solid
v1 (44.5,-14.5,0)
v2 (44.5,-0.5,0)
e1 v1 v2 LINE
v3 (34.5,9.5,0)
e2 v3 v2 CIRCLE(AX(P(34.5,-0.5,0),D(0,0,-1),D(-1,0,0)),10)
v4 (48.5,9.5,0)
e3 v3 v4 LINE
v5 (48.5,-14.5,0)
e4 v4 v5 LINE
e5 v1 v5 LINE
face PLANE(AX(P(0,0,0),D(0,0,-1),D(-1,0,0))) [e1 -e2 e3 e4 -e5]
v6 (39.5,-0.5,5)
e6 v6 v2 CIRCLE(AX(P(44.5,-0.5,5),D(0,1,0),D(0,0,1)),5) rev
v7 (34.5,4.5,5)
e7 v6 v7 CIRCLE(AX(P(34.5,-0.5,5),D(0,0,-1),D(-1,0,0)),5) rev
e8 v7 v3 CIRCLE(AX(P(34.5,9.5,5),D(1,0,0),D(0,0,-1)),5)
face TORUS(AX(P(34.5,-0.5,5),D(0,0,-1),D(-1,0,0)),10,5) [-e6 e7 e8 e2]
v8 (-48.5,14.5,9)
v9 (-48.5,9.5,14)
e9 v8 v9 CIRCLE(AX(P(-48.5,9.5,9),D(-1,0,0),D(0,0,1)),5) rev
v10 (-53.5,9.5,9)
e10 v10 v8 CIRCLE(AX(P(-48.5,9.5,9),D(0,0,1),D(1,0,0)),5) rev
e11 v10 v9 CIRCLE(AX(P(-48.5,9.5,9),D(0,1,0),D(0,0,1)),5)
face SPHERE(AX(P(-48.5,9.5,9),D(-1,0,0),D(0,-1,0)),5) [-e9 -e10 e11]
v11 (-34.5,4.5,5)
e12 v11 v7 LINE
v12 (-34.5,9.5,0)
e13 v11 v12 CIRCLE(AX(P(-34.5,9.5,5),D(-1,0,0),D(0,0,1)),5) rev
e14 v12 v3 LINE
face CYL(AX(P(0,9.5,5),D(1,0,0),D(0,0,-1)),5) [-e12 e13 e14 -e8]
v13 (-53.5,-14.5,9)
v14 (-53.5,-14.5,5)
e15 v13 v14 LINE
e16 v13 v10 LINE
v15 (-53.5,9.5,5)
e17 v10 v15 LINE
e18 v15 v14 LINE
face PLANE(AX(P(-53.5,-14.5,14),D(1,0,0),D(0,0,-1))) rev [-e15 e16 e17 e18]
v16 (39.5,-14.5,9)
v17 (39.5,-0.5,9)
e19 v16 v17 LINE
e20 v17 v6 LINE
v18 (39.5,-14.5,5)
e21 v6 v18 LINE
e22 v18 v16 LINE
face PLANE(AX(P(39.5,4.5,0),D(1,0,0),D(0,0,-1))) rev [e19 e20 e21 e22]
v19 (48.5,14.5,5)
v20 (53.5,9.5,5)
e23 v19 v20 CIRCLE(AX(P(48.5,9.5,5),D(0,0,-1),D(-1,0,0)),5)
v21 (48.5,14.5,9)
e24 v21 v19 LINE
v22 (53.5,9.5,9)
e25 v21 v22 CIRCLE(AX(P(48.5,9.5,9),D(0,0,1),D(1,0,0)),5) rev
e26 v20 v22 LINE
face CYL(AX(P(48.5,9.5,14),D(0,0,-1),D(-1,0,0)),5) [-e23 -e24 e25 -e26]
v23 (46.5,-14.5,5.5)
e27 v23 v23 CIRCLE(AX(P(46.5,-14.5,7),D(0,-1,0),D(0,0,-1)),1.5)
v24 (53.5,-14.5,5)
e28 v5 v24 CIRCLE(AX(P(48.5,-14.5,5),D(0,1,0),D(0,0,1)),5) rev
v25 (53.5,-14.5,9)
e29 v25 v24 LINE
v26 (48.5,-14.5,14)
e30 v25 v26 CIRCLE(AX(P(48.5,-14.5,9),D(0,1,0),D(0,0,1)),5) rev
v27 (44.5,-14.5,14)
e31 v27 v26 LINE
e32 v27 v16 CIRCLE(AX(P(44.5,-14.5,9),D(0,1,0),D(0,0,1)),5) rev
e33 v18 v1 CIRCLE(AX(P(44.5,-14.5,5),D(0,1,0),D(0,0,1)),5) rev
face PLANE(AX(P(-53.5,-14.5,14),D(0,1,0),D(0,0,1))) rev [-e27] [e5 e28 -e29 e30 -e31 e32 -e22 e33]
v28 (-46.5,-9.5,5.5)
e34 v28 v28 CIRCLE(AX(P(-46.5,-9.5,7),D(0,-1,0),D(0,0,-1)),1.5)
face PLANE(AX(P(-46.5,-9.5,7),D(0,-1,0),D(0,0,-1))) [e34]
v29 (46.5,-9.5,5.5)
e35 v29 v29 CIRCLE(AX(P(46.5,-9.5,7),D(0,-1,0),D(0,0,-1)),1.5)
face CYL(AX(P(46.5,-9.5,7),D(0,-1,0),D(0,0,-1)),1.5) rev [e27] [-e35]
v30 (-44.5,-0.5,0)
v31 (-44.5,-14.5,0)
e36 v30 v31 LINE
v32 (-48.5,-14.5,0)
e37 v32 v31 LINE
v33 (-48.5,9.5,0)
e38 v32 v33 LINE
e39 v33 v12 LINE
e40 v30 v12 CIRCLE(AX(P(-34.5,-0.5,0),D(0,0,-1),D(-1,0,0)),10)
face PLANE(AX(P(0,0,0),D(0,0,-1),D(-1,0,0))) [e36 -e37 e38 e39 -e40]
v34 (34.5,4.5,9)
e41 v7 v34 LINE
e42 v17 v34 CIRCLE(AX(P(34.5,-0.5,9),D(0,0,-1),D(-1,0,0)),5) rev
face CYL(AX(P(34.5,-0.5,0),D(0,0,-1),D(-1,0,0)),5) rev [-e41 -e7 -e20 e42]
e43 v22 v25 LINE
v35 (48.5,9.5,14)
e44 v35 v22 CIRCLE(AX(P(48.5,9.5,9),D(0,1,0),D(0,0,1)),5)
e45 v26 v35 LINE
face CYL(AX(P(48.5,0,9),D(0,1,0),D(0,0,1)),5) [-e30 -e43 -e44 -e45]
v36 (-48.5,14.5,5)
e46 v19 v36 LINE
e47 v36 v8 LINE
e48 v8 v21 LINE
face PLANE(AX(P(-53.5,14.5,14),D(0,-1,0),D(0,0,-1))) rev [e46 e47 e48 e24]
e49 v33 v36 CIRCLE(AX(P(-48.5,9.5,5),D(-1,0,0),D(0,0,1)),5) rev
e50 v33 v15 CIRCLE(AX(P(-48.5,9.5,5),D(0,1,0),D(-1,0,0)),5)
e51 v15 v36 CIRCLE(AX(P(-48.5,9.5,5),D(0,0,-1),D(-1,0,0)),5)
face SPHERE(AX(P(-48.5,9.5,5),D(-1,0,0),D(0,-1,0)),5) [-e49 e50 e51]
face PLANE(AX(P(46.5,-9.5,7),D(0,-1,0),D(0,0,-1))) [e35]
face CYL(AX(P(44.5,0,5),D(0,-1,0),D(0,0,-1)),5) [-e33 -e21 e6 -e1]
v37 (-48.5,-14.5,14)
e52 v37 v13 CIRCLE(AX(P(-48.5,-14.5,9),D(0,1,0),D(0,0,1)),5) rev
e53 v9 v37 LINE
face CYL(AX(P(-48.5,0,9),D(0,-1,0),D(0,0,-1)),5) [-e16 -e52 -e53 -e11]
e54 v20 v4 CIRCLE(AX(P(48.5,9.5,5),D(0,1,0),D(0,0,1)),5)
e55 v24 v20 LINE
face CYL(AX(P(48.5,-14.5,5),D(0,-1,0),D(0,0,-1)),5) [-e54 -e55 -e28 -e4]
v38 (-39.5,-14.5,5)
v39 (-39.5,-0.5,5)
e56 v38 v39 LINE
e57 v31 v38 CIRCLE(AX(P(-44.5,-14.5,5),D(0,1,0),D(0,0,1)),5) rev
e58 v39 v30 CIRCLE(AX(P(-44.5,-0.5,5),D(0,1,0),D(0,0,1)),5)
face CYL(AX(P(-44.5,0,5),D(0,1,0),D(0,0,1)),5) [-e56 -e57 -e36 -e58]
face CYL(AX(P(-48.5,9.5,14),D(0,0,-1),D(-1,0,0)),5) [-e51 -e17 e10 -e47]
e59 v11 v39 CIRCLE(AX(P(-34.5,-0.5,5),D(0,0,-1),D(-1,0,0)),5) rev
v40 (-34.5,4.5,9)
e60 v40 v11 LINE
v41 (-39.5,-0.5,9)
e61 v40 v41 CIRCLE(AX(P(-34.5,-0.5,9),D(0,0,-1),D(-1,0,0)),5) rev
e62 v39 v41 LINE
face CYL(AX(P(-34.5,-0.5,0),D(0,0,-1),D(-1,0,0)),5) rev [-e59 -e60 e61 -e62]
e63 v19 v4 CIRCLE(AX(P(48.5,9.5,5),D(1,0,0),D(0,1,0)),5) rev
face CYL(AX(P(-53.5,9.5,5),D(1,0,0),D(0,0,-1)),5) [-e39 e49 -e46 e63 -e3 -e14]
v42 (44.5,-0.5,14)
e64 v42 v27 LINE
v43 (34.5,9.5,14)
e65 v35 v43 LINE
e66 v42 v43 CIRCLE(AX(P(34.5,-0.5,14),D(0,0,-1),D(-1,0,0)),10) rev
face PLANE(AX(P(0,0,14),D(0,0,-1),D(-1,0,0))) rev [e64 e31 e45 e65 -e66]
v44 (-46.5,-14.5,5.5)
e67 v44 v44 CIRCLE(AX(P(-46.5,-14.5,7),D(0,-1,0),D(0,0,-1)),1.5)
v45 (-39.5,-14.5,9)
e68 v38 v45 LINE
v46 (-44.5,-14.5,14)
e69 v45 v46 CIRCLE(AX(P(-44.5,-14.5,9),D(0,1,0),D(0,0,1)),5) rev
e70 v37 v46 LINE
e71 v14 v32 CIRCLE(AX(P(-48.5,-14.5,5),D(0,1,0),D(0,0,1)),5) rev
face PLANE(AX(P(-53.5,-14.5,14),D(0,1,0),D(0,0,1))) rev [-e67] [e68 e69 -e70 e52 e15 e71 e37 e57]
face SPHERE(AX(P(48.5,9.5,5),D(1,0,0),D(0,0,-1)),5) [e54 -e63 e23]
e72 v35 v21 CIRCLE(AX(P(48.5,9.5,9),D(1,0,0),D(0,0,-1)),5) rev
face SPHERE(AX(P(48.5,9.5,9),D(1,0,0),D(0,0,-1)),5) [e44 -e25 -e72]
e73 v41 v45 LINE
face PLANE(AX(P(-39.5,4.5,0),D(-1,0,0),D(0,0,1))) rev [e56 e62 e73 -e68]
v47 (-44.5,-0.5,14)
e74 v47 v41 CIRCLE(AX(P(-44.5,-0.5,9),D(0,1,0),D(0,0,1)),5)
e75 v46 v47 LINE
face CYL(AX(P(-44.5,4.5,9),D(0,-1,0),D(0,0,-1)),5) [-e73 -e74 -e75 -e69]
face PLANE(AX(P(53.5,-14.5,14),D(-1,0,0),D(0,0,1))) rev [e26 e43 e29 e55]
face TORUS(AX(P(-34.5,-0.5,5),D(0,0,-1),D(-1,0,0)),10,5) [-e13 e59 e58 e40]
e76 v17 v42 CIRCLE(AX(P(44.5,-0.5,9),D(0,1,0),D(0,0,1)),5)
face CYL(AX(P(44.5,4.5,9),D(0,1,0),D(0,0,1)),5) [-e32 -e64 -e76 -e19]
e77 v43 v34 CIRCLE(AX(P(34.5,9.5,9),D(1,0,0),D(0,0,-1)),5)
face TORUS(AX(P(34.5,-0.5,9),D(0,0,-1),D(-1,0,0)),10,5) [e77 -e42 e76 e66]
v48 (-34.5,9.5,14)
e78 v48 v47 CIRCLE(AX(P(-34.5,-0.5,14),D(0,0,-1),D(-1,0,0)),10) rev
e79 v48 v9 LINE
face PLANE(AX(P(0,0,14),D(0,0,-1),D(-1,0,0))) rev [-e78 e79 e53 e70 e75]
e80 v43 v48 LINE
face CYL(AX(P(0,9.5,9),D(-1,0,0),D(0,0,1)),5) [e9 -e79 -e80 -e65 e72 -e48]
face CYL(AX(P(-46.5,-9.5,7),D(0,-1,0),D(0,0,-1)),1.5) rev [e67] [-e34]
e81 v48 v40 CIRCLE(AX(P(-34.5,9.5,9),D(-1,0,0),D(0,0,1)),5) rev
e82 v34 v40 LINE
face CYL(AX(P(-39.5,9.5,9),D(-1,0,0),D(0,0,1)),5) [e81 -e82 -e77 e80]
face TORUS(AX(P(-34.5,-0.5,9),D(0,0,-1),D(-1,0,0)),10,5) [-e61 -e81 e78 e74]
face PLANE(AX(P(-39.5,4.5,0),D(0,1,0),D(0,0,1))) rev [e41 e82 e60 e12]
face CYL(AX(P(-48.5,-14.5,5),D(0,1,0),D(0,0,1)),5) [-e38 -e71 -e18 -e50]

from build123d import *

# Parameters (mm, degrees)
ESQUISSE1_W             = 107
ESQUISSE1_H             = 29
BOSS_EXTRU_1_DEPTH      = 14
ESQUISSE2_W             = 79
ESQUISSE2_H             = 19
ENL_V_MAT_EXTRU_1_DEPTH = 58.170796741
CONG_1_R                = 5
ESQUISSE3_R             = 1.5
ENL_V_MAT_EXTRU_2_DEPTH = 5


with BuildPart() as part:
    # Esquisse1 → Boss.-Extru.1 (new body)
    with BuildSketch(Plane.XY):
        Rectangle(ESQUISSE1_W, ESQUISSE1_H)
    extrude(amount=BOSS_EXTRU_1_DEPTH)

    # Esquisse2 → Enlèv. mat.-Extru.1 (cut, through all)
    with BuildSketch(Plane.XY.offset(14)):
        with Locations((0, -5)):
            Rectangle(ESQUISSE2_W, ESQUISSE2_H)
    extrude(amount=-ENL_V_MAT_EXTRU_1_DEPTH, mode=Mode.SUBTRACT)

    # Congé1
    cong_1_edges = [part.edges().sort_by_distance(p)[0] for p in [
        (-53.5, 0, 14),
        (39.5, -5, 0),
        (39.5, 4.5, 7),
        (-39.5, -5, 0),
        (0, 4.5, 0),
        (-39.5, 4.5, 7),
        (39.5, -5, 14),
        (0, 4.5, 14),
        (-39.5, -5, 14),
        (53.5, 0, 14),
        (-53.5, 0, 0),
        (0, 14.5, 0),
        (53.5, 0, 0),
        (-53.5, 14.5, 7),
        (53.5, 14.5, 7),
        (0, 14.5, 14),
    ]]
    fillet(cong_1_edges, radius=CONG_1_R - 0.0001)  # a hair under: the kernel refuses the full size

    # Esquisse3 → Enlèv. mat.-Extru.2 (cut)
    with BuildSketch(Plane.XZ.offset(14.5)):
        with Locations(Location((-46.5, 7, 0), (0, 0, 270))):
            Circle(ESQUISSE3_R)
        with Locations(Location((46.5, 7, 0), (0, 0, 270))):
            Circle(ESQUISSE3_R)
    extrude(amount=-ENL_V_MAT_EXTRU_2_DEPTH, mode=Mode.SUBTRACT)


solid = part.part
